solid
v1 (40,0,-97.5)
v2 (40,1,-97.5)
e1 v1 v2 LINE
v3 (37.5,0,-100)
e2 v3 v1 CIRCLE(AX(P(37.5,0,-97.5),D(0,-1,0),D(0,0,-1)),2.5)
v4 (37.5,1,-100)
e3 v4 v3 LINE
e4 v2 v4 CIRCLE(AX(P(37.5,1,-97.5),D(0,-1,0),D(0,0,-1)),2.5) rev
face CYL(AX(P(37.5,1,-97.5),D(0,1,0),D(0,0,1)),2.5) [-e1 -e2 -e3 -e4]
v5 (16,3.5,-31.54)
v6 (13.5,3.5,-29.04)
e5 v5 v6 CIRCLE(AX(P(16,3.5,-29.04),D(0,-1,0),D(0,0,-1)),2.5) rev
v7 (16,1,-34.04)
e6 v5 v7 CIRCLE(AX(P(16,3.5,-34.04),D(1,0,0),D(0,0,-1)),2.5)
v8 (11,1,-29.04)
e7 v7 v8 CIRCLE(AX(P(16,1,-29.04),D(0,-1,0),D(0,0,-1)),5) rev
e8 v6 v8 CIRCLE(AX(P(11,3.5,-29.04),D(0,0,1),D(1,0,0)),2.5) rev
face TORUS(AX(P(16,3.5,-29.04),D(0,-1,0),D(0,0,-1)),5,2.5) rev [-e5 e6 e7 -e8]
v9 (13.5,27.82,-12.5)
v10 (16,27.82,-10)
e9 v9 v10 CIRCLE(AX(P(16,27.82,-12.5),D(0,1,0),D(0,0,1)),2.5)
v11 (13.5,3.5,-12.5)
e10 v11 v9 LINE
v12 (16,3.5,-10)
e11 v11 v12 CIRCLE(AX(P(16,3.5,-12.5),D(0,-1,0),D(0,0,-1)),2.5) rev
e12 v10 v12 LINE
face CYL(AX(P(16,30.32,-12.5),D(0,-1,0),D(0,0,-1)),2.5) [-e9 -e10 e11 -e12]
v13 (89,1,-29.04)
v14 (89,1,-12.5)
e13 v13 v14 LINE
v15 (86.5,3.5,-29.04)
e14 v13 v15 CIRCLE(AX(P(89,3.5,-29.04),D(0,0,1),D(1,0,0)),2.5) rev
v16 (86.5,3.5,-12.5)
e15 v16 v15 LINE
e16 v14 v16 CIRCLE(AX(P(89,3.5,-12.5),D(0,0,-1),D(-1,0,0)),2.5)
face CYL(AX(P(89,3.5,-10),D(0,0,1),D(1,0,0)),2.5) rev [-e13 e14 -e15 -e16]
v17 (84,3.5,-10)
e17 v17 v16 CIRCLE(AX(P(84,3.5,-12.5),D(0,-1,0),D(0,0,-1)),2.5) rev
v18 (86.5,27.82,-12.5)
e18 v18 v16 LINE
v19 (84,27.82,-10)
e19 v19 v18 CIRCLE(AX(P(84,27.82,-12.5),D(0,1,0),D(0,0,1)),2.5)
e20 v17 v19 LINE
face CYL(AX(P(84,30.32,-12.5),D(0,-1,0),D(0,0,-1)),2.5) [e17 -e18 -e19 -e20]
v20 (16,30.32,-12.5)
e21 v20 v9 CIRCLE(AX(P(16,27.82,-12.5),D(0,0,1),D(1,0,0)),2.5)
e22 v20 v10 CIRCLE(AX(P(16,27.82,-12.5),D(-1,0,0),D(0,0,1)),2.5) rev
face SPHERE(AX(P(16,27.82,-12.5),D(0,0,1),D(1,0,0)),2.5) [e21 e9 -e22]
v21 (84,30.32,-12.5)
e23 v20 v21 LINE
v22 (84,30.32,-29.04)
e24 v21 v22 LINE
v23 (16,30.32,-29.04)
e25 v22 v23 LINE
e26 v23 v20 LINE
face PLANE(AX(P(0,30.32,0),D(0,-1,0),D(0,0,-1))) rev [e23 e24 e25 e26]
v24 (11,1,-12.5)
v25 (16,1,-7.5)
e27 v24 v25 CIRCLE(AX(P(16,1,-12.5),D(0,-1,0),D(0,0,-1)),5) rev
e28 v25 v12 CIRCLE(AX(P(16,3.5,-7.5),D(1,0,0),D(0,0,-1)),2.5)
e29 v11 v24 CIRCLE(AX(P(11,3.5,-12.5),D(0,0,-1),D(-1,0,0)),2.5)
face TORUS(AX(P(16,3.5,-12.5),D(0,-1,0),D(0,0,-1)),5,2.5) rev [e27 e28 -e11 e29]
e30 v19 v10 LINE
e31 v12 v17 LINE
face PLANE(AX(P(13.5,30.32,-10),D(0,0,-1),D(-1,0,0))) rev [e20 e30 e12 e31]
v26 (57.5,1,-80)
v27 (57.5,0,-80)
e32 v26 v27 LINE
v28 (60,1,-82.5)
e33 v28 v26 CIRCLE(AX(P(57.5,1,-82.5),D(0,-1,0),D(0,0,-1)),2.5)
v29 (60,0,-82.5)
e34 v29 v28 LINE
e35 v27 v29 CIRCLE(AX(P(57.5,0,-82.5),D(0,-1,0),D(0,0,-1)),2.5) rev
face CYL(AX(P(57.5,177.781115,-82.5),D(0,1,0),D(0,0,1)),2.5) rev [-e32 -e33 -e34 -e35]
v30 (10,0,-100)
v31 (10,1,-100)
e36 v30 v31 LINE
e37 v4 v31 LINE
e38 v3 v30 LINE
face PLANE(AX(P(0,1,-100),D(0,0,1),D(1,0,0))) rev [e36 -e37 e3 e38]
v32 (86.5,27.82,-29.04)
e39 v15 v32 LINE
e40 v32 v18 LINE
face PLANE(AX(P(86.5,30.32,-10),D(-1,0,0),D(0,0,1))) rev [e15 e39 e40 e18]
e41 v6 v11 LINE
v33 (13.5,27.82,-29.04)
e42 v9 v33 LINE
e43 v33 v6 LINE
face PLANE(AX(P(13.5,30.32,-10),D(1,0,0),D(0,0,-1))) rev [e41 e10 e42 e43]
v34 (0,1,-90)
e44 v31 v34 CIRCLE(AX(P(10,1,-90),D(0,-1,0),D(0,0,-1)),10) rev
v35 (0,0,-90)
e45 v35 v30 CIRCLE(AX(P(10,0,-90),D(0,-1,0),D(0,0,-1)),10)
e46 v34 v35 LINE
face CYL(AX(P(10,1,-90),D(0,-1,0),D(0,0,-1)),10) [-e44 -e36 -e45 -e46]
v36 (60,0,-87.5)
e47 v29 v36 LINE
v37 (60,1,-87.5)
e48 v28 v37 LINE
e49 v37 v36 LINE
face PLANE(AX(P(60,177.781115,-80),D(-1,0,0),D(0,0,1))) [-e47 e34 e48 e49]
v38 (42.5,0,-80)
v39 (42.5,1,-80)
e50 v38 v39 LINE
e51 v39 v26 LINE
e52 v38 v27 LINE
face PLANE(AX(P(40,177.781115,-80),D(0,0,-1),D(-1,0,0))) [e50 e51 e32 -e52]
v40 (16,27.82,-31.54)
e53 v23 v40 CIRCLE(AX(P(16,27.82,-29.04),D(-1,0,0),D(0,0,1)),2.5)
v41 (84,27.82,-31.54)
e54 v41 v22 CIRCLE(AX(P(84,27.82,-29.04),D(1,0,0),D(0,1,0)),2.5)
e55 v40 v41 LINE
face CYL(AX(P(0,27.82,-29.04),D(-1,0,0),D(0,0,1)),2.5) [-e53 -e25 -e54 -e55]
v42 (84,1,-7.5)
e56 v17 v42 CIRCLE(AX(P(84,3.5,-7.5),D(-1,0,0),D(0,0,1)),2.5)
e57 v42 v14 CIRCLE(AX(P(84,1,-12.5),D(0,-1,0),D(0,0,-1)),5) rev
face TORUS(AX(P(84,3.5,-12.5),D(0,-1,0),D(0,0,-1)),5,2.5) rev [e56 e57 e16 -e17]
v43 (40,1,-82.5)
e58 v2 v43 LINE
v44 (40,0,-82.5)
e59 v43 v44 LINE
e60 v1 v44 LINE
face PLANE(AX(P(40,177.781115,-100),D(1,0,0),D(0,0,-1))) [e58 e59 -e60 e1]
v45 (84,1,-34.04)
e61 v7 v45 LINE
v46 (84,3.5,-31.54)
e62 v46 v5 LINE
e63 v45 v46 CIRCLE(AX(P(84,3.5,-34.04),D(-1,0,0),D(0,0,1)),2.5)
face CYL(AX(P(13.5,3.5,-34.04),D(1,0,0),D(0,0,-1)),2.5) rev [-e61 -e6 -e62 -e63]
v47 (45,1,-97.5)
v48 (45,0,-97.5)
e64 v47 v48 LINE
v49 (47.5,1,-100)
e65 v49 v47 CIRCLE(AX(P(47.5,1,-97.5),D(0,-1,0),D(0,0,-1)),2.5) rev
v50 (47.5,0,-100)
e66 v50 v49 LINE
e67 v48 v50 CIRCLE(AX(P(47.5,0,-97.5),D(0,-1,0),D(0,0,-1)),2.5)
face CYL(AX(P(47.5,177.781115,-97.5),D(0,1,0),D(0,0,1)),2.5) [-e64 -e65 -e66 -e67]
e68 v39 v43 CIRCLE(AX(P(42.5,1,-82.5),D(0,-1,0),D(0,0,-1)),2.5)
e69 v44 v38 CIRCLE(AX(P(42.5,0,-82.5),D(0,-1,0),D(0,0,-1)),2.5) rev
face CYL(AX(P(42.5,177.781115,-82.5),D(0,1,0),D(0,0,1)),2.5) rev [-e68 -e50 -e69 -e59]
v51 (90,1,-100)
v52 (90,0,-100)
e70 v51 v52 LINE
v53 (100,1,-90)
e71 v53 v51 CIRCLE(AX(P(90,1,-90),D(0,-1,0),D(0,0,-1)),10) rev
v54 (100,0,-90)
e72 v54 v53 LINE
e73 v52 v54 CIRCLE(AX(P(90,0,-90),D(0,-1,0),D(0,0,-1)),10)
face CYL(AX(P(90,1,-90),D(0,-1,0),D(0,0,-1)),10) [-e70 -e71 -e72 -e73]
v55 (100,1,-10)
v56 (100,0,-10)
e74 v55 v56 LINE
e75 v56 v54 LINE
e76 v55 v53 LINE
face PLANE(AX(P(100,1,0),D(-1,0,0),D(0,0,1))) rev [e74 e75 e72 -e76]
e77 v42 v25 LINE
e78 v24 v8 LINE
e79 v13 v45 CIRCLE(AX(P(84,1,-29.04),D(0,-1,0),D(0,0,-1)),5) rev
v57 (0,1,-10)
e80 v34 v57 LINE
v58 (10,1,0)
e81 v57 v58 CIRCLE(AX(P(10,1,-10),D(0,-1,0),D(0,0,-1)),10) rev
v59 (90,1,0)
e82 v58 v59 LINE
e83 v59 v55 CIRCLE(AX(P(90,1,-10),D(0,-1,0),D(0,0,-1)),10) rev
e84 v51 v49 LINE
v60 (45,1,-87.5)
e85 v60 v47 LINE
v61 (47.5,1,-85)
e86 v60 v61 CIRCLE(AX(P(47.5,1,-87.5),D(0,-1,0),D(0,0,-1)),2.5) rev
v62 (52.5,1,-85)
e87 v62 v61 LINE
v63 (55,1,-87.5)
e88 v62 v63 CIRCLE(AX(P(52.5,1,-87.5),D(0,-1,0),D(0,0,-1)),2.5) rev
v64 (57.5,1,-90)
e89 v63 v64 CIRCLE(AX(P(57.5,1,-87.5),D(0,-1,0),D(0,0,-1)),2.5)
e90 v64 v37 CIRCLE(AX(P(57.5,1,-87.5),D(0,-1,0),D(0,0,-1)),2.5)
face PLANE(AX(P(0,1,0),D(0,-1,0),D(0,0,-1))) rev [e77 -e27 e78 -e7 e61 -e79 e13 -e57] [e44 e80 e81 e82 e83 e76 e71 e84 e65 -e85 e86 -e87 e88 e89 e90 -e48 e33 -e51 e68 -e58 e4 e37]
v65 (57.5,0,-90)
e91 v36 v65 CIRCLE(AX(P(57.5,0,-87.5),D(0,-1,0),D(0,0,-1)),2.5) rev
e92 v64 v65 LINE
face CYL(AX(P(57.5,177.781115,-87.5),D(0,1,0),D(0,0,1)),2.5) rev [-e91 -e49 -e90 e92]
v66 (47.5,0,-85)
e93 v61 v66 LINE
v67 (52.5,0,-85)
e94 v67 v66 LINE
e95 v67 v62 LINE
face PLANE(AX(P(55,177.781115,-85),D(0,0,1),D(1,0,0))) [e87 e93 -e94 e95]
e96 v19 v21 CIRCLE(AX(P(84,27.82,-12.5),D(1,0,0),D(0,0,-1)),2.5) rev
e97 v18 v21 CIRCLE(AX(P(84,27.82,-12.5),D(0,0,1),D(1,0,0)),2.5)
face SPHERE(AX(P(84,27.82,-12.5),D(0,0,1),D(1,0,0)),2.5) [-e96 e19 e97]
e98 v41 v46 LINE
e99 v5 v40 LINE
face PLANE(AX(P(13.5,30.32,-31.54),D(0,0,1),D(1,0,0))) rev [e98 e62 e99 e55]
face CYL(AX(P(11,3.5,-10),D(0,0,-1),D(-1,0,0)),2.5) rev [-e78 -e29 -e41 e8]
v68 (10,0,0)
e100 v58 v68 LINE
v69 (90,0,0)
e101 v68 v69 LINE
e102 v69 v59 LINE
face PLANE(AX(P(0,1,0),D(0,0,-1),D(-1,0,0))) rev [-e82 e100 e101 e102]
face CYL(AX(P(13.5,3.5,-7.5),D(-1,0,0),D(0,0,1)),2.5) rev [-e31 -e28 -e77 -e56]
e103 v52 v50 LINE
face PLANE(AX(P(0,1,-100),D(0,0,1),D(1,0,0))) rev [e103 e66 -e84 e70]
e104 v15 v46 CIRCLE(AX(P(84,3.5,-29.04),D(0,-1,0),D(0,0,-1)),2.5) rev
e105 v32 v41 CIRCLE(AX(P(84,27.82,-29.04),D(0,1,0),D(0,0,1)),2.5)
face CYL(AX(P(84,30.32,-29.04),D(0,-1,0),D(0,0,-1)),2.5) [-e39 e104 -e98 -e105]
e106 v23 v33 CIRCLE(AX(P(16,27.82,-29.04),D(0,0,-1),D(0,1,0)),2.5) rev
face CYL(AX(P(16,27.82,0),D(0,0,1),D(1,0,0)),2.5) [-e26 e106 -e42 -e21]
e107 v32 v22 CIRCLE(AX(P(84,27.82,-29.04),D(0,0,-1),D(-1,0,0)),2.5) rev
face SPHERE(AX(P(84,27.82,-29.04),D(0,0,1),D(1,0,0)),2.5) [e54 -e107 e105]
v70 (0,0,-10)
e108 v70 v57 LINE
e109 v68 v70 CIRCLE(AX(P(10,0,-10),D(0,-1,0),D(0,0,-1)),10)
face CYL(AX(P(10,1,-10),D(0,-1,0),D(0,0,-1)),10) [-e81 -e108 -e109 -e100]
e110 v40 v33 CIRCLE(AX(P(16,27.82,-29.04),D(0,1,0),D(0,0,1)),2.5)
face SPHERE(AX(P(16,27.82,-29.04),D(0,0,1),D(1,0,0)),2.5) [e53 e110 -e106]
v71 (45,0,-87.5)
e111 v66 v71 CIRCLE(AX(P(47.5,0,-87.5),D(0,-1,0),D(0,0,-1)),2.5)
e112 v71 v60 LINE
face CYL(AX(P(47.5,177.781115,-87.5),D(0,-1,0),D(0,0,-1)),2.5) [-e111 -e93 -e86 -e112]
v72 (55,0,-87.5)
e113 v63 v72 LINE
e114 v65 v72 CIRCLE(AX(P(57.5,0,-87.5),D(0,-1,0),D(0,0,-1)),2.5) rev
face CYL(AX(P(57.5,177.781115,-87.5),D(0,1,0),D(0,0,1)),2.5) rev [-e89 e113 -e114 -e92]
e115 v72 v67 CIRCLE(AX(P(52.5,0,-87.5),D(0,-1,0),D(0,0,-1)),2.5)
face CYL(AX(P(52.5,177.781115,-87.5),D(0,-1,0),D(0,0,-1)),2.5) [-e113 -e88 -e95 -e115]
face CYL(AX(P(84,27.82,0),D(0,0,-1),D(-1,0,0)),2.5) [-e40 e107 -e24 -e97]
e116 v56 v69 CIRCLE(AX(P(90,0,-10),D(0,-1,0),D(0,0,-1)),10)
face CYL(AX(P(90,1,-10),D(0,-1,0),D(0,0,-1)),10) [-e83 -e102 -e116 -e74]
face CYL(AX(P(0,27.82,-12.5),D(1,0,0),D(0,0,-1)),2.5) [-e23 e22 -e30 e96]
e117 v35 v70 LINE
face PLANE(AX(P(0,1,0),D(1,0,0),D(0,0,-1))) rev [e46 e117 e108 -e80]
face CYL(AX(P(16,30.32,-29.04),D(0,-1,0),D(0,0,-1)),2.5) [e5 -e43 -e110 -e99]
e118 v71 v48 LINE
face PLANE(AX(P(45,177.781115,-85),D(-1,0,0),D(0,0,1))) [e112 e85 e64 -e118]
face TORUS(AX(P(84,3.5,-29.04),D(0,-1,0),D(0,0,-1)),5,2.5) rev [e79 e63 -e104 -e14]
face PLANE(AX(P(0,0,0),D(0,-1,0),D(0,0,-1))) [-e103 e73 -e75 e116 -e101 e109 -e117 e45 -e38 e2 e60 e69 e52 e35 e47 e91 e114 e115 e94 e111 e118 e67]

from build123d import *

# Parameters (mm, degrees)
SKETCH2_W               = 100
SKETCH2_H               = 100
BOSS_EXTRUDE1_DEPTH     = 1
FILLET1_R               = 10
CUT_EXTRUDE1_DEPTH      = 142.424891727
CUT_EXTRUDE1_DEPTH_BACK = 142.424891727
FILLET2_R               = 2.5
SKETCH4_W               = 73
SKETCH4_H               = 21.54
BOSS_EXTRUDE2_DEPTH     = 29.32
FILLET3_R               = 2.5


with BuildPart() as part:
    # Sketch2 → Boss-Extrude1 (new body)
    with BuildSketch(Plane(origin=(0, 0, 0), x_dir=(1, 0, 0), z_dir=(0, 1, 0))):
        with Locations((50, 50)):
            Rectangle(SKETCH2_W, SKETCH2_H)
    extrude(amount=BOSS_EXTRUDE1_DEPTH)

    # Fillet1
    fillet1_edges = [part.edges().sort_by_distance(p)[0] for p in [
        (0, 0.5, -100),
        (100, 0.5, -100),
        (100, 0.5, 0),
        (0, 0.5, 0),
    ]]
    fillet(fillet1_edges, radius=FILLET1_R)

    # Sketch3 → Cut-Extrude1 (cut, two sides: drawn at the far end of the back side and taken through both)
    with BuildSketch(Plane(origin=(0, 1, 0), x_dir=(1, 0, 0), z_dir=(0, 1, 0)).offset(-CUT_EXTRUDE1_DEPTH_BACK)):
        Polygon((40, 343.238075794), (40, 100), (40, 80), (60, 80), (60, 90), (55, 90), (55, 85), (45, 85), (45, 100), (45, 343.238075794), (45, 829.714227381), (40, 829.714227381), align=None)
    extrude(amount=CUT_EXTRUDE1_DEPTH + CUT_EXTRUDE1_DEPTH_BACK, mode=Mode.SUBTRACT)

    # Fillet2
    fillet2_edges = [part.edges().sort_by_distance(p)[0] for p in [
        (60, 0.5, -80),
        (60, 0.5, -90),
        (55, 0.5, -90),
        (40, 0.5, -80),
    ]]
    fillet(fillet2_edges, radius=FILLET2_R - 0.0001)  # a hair under: the kernel refuses the full size
    fillet2_2_edges = [part.edges().sort_by_distance(p)[0] for p in [
        (45, 0.5, -100),
        (40, 0.5, -100),
        (55, 0.5, -85),
        (45, 0.5, -85),
    ]]
    fillet(fillet2_2_edges, radius=FILLET2_R)

    # Sketch4 → Boss-Extrude2 (add)
    with BuildSketch(Plane(origin=(0, 1, 0), x_dir=(1, 0, 0), z_dir=(0, 1, 0))):
        with Locations((50, 20.77)):
            Rectangle(SKETCH4_W, SKETCH4_H)
    extrude(amount=BOSS_EXTRUDE2_DEPTH)

    # Fillet3
    fillet3_edges = [part.edges().sort_by_distance(p)[0] for p in [
        (13.5, 1, -20.77),
        (13.5, 15.66, -31.54),
        (50, 1, -10),
        (13.5, 15.66, -10),
        (86.5, 1, -20.77),
        (86.5, 15.66, -10),
        (50, 1, -31.54),
        (86.5, 15.66, -31.54),
        (13.5, 30.32, -20.77),
        (50, 30.32, -10),
        (86.5, 30.32, -20.77),
        (50, 30.32, -31.54),
    ]]
    fillet(fillet3_edges, radius=FILLET3_R)


solid = part.part
